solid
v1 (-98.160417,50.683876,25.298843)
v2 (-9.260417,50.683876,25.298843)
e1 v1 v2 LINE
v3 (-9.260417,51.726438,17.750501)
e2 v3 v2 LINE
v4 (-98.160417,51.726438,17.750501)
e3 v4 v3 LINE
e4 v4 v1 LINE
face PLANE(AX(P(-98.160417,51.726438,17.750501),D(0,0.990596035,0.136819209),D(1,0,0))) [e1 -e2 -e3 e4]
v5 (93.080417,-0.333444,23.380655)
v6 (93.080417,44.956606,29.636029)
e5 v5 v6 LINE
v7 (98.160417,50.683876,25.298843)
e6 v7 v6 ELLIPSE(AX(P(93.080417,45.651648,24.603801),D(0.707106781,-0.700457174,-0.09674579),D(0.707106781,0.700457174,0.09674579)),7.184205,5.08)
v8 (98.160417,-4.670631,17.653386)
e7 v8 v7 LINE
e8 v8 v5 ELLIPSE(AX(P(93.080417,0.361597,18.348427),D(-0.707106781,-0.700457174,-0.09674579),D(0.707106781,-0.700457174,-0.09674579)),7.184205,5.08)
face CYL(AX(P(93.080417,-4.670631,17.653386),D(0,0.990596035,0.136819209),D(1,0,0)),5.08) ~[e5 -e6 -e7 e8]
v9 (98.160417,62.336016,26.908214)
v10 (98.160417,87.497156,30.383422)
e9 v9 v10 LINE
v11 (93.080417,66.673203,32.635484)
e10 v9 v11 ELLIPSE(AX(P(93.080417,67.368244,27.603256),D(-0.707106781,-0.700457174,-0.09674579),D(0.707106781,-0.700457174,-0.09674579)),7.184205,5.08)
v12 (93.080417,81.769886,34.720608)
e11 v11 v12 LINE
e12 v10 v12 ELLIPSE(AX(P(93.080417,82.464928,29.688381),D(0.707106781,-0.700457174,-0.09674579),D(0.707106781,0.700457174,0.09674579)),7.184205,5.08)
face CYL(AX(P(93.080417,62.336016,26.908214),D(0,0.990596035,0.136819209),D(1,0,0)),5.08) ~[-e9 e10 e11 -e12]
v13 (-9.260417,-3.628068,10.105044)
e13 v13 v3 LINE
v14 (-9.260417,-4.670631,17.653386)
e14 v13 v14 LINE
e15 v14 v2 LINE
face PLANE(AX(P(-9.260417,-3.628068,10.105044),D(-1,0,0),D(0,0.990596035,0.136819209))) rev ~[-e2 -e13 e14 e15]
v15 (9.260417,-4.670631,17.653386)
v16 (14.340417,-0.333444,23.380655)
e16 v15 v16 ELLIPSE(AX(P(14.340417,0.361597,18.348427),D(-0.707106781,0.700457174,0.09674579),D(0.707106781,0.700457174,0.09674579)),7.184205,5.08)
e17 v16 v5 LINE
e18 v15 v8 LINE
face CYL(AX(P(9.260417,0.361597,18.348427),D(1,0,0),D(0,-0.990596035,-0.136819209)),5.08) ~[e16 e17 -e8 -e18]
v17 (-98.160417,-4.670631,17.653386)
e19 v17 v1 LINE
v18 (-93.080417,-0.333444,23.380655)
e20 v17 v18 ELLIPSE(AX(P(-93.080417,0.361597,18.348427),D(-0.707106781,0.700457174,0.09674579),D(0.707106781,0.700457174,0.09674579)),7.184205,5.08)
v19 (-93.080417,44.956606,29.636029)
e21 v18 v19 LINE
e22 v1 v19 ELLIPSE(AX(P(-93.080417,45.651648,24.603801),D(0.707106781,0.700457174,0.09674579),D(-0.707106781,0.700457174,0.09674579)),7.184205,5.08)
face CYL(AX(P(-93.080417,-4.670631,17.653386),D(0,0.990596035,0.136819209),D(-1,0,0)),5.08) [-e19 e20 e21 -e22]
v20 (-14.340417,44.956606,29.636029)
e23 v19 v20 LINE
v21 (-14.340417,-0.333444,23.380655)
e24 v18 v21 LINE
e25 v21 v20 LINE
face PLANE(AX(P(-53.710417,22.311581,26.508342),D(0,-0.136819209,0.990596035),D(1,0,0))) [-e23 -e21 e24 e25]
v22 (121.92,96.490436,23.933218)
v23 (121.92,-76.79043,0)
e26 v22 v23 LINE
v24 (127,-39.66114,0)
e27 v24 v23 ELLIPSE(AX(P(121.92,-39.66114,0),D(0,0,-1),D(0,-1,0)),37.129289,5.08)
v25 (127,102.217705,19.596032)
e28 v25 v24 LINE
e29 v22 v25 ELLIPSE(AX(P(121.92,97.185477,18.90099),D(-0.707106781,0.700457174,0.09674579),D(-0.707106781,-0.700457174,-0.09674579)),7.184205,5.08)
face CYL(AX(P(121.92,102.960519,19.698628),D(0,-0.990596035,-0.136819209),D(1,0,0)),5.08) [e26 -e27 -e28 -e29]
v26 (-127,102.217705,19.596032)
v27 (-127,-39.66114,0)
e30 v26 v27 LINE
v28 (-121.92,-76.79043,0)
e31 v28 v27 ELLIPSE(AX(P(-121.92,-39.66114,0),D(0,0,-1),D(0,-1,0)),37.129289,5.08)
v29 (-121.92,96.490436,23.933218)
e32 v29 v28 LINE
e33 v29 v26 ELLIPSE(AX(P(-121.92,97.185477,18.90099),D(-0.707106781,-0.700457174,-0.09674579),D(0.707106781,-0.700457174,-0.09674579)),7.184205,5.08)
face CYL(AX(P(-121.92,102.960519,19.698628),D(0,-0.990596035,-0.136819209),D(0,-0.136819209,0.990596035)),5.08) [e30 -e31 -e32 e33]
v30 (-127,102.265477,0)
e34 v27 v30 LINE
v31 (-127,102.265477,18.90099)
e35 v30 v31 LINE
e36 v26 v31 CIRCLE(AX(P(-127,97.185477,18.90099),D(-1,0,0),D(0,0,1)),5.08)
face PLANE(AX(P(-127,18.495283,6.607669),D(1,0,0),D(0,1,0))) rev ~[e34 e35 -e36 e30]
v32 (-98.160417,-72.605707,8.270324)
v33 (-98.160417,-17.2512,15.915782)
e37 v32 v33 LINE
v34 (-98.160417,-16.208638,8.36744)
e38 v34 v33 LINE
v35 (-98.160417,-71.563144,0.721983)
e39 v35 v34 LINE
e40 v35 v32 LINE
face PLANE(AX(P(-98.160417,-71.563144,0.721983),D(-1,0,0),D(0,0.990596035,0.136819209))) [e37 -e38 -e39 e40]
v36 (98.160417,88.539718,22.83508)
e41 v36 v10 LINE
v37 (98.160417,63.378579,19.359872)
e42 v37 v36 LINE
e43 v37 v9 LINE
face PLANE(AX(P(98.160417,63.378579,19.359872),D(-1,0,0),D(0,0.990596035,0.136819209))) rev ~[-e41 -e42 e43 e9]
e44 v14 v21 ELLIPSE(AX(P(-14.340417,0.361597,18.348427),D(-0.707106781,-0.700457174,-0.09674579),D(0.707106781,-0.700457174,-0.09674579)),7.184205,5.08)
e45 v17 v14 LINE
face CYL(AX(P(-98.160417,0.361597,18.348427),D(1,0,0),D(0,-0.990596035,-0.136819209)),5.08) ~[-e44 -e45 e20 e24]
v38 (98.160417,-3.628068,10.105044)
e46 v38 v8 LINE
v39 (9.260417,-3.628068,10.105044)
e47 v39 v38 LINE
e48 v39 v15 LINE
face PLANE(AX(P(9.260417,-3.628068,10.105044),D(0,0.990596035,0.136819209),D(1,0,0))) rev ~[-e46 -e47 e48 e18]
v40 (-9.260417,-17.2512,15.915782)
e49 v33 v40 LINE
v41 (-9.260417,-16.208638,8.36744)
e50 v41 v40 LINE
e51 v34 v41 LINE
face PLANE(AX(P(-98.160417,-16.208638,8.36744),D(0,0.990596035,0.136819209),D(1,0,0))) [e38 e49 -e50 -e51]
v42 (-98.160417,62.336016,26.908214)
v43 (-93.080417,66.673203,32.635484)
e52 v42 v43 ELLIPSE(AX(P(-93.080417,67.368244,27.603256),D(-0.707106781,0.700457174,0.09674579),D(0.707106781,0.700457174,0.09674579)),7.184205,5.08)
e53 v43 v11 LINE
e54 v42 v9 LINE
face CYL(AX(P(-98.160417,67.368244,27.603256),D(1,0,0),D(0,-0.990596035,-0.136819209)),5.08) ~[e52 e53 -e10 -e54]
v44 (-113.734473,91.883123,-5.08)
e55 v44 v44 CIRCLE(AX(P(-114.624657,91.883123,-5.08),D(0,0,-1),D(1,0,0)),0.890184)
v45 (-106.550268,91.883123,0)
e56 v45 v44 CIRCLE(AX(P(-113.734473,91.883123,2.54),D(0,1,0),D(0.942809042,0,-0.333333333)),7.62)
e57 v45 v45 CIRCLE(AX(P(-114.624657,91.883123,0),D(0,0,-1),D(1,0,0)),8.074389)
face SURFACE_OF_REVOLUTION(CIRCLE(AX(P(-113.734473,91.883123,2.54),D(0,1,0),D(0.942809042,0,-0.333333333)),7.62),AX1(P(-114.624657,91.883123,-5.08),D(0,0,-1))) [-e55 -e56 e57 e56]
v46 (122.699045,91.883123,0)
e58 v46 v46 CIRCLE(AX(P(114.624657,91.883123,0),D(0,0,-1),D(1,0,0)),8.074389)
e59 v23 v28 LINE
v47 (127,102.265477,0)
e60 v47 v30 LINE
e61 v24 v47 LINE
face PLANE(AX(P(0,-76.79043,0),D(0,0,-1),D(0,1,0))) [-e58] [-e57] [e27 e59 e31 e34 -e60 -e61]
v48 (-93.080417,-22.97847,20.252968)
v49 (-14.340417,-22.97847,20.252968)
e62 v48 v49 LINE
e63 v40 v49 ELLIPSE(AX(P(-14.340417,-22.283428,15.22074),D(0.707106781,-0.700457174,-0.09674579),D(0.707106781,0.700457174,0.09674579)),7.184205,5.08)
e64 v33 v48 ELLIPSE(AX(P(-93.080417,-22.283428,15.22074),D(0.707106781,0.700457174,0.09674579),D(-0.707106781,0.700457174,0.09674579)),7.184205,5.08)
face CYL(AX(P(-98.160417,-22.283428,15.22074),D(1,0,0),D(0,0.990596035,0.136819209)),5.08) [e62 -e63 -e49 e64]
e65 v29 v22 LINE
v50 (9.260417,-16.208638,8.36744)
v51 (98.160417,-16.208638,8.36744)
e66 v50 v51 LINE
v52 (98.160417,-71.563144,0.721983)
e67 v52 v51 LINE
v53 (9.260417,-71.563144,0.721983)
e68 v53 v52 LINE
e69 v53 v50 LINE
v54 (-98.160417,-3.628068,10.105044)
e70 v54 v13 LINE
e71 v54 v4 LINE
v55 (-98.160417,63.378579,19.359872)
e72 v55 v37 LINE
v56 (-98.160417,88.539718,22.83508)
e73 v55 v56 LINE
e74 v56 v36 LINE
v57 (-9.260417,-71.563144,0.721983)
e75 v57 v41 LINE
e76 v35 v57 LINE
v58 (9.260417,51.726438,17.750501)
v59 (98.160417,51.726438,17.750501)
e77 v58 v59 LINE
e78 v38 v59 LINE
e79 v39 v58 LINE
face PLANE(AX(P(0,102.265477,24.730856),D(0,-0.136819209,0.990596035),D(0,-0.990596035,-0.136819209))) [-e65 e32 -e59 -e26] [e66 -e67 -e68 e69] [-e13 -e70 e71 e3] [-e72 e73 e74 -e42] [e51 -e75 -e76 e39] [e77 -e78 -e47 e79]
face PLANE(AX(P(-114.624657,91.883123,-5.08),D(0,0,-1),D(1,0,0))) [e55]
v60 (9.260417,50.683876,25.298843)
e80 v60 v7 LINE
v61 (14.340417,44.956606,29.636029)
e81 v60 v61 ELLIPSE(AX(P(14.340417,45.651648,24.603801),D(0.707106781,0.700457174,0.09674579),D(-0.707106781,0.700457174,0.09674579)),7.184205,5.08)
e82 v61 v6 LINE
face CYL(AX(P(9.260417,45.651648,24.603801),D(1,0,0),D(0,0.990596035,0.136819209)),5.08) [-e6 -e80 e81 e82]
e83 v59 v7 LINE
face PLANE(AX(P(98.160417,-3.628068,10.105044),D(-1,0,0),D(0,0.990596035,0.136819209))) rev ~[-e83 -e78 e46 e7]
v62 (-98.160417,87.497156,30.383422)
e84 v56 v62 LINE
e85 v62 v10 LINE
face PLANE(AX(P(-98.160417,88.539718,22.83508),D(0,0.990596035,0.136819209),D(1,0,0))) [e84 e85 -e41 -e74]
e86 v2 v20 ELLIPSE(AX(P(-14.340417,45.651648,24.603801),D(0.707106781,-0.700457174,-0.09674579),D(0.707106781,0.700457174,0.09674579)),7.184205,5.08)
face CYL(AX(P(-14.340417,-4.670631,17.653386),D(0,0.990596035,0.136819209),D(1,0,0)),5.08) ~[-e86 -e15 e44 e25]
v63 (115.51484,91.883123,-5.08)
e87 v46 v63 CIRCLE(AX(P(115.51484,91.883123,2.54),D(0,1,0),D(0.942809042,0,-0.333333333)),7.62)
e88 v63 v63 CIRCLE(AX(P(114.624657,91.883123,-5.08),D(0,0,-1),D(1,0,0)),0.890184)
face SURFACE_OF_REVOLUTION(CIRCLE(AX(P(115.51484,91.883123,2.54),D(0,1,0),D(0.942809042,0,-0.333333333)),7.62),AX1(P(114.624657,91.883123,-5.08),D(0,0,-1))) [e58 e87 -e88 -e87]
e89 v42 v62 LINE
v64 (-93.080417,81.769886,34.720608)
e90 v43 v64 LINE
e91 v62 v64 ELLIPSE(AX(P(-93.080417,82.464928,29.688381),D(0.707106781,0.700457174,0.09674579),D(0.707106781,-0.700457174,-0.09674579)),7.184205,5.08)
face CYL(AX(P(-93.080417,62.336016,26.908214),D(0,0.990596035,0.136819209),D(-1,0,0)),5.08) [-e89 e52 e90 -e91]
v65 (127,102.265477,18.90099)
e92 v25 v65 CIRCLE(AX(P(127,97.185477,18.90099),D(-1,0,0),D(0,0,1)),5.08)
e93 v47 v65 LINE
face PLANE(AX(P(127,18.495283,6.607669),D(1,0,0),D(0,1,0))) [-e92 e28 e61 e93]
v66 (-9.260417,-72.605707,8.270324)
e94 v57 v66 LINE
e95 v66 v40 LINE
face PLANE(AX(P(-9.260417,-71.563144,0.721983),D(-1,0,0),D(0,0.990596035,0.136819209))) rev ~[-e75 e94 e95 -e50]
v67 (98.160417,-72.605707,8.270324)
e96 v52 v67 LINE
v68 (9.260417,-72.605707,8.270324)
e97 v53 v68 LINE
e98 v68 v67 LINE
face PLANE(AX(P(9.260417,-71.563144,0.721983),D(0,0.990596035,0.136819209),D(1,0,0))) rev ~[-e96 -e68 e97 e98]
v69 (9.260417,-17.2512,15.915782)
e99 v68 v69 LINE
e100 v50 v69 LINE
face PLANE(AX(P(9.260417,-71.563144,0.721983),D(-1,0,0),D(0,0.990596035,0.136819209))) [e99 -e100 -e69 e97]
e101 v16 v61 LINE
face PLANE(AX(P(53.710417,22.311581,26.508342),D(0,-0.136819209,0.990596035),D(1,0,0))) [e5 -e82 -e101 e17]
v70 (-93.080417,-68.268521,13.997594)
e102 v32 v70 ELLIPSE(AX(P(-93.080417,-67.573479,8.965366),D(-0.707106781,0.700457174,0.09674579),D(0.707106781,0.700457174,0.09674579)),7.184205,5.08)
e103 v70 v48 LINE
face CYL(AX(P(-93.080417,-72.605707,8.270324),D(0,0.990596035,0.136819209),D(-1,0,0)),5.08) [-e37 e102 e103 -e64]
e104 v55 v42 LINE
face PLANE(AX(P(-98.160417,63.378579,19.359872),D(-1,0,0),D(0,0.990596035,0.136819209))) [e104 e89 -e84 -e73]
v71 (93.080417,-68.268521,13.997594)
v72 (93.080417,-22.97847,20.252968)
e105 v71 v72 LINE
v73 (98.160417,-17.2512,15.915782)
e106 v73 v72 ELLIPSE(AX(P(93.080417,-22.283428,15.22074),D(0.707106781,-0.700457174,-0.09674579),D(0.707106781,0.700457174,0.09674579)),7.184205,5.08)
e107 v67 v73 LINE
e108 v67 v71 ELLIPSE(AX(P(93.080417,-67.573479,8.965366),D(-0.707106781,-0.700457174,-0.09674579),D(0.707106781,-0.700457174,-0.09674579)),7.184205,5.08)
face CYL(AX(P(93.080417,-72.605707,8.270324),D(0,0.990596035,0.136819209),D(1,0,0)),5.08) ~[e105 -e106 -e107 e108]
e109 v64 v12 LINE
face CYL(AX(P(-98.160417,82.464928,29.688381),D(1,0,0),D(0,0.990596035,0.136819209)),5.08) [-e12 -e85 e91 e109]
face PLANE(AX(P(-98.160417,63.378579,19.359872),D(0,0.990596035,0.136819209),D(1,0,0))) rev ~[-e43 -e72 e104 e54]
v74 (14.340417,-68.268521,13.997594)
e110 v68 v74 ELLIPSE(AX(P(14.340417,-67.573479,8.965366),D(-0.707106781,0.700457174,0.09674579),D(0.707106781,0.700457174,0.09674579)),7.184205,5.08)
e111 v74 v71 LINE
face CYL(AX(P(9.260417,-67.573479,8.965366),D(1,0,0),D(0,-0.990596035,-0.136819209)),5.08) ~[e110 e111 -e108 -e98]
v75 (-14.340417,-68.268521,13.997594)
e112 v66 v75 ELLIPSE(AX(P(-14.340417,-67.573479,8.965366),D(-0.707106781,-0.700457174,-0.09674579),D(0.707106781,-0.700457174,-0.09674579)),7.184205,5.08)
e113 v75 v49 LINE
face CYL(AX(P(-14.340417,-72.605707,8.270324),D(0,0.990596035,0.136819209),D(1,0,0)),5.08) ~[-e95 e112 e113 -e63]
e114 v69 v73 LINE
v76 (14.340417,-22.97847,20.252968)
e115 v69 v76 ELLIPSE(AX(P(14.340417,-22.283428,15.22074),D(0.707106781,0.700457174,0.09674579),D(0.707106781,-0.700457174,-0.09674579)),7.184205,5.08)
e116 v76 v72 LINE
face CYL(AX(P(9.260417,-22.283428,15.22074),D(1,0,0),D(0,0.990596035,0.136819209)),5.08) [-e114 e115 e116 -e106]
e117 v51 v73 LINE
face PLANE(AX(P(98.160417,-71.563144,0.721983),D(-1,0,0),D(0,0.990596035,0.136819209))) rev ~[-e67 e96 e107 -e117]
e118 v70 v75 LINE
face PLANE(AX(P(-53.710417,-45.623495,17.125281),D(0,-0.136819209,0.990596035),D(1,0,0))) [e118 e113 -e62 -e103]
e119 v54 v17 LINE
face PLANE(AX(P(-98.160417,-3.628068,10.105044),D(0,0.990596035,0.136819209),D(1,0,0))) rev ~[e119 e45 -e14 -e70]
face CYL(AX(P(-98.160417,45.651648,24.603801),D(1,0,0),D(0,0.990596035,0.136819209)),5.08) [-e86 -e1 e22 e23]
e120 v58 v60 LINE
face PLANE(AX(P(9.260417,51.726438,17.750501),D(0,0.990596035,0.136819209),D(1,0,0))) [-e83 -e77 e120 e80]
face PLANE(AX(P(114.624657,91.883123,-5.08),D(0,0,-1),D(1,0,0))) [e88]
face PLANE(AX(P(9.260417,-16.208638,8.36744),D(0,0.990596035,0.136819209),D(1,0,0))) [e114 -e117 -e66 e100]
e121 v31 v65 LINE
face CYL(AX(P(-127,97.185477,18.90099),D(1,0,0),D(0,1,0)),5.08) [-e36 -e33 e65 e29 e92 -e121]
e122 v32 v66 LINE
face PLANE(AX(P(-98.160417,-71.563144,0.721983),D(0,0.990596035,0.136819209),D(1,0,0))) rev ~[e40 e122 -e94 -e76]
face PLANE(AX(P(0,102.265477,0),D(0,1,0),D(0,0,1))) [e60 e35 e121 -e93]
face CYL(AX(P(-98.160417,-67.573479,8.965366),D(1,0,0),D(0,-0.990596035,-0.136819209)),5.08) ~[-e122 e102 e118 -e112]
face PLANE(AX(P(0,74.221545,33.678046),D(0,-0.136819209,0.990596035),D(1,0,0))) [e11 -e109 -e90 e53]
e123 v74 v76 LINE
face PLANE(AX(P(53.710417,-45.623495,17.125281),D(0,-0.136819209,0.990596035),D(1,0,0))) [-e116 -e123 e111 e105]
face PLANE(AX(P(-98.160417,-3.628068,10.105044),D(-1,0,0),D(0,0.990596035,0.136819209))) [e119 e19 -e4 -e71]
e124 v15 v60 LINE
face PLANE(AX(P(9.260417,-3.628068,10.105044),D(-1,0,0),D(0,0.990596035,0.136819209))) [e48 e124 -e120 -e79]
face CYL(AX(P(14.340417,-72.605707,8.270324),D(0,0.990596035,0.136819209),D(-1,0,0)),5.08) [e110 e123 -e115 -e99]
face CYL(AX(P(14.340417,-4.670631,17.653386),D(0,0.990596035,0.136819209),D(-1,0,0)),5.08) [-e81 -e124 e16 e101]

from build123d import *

# Parameters (mm, degrees)
F1_DEPTH  = 127
F2_R      = 5.08
F3_W      = 88.9
F3_H      = 55.88
F4_DEPTH  = 12.7
F5_R      = 5.08
F6_W      = 196.3208343999
F6_H      = 25.4
F7_DEPTH  = 12.7
F8_R      = 5.08
F9_R      = 8.0743885719
F10_DEPTH = 5.08


# Not quite as in the source:
# - a fillet or chamfer that OpenCascade refuses, or shapes differently, is made with other operations: its cross-section is extruded or revolved along the edge and cut away or added


with BuildPart() as f1:
    # F0 (on Right) → F1 (new body, symmetric)
    with BuildSketch(Plane.YZ):
        Polygon((102.2654771805, 0), (102.2654771805, 24.730855599), (-76.7904296517, 0), align=None)
    extrude(amount=F1_DEPTH, both=True)

    # F2
    f2_edges = [f1.edges().sort_by_distance(p)[0] for p in [
        (-127, 12.737524, 12.365428),
        (127, 12.737524, 12.365428),
        (0, 102.265477, 24.730856),
    ]]
    fillet(f2_edges, radius=F2_R)

    # F3 (on face) → F4 (join)
    with BuildSketch(Plane(origin=(0, -1.4374781315, 10.4076039488), x_dir=(1, 0, 0), z_dir=(0, -0.1368192087, 0.9905960348))):
        with Locations((-53.7104171999, 25.7286139321)):
            Rectangle(F3_W, F3_H)
        with Locations((53.7104171999, 25.7286139321)):
            Rectangle(F3_W, F3_H)
        with Locations((53.7104171999, -42.8513860679)):
            Rectangle(F3_W, F3_H)
        with Locations((-53.7104171999, -42.8513860679)):
            Rectangle(F3_W, F3_H)
    extrude(amount=F4_DEPTH)

    # F5
    f5_edges = [f1.edges().sort_by_distance(p)[0] for p in [
        (-98.160417, 22.311581, 26.508342),
        (-53.710417, -5.365672, 22.685613),
        (-98.160417, -45.623495, 17.125281),
        (-53.710417, -73.300748, 13.302552),
        (-53.710417, -17.946242, 20.94801),
        (-9.260417, -45.623495, 17.125281),
        (53.710417, -5.365672, 22.685613),
        (9.260417, 22.311581, 26.508342),
        (53.710417, 49.988834, 30.331071),
        (98.160417, 22.311581, 26.508342),
        (53.710417, -17.946242, 20.94801),
        (9.260417, -45.623495, 17.125281),
        (53.710417, -73.300748, 13.302552),
        (98.160417, -45.623495, 17.125281),
        (-9.260417, 22.311581, 26.508342),
        (-53.710417, 49.988834, 30.331071),
    ]]
    fillet(f5_edges, radius=F5_R)

    # F6 (on face) → F7 (join)
    with BuildSketch(Plane(origin=(0, -1.4374781315, 10.4076039488), x_dir=(1, 0, 0), z_dir=(0, -0.1368192087, 0.9905960348))):
        with Locations((0, 78.1313713312)):
            Rectangle(F6_W, F6_H)
    extrude(amount=F7_DEPTH)

    # F8
    f8_edges = [f1.edges().sort_by_distance(p)[0] for p in [
        (0, 61.640975, 31.940442),
        (0, 86.802114, 35.41565),
        (98.160417, 74.221545, 33.678046),
        (-98.160417, 74.221545, 33.678046),
    ]]
    fillet(f8_edges, radius=F8_R)

    # F9 (on face) → F10 (join)
    with BuildSketch(Plane(origin=(0, 0, 0), x_dir=(1, 0, 0), z_dir=(0, 0, -1))):
        with Locations((-114.6246567369, -91.883122921)):
            Circle(F9_R)
        with Locations((114.6246567369, -91.883122921)):
            Circle(F9_R)
    extrude(amount=F10_DEPTH)

    # F11: fillet of radius 7.62 on 2 edges, made by hand

    # F11_s1 → F11_t2 (revolve, cut)
    with BuildSketch(Plane.XZ.offset(-91.883122921)):
        with BuildLine():
            ThreePointArc((122.6990453088, 0), (119.9142494631, -3.6817039467), (115.5148404119, -5.08))
            Line((115.5148404119, -5.08), (122.6990453088, -5.08))
            Line((122.6990453088, -5.08), (122.6990453088, 0))
        make_face()
    revolve(axis=Axis((114.6246567369, 91.883122921, -5.08), (0, 0, -1)), mode=Mode.SUBTRACT)

    # F11_s3 → F11_t4 (revolve, cut)
    with BuildSketch(Plane.XZ.offset(-91.883122921)):
        with BuildLine():
            ThreePointArc((-106.5502681649, 0), (-109.3350640106, -3.6817039467), (-113.7344730618, -5.08))
            Line((-113.7344730618, -5.08), (-106.5502681649, -5.08))
            Line((-106.5502681649, -5.08), (-106.5502681649, 0))
        make_face()
    revolve(axis=Axis((-114.6246567369, 91.883122921, -5.08), (0, 0, -1)), mode=Mode.SUBTRACT)


solid = f1.part
